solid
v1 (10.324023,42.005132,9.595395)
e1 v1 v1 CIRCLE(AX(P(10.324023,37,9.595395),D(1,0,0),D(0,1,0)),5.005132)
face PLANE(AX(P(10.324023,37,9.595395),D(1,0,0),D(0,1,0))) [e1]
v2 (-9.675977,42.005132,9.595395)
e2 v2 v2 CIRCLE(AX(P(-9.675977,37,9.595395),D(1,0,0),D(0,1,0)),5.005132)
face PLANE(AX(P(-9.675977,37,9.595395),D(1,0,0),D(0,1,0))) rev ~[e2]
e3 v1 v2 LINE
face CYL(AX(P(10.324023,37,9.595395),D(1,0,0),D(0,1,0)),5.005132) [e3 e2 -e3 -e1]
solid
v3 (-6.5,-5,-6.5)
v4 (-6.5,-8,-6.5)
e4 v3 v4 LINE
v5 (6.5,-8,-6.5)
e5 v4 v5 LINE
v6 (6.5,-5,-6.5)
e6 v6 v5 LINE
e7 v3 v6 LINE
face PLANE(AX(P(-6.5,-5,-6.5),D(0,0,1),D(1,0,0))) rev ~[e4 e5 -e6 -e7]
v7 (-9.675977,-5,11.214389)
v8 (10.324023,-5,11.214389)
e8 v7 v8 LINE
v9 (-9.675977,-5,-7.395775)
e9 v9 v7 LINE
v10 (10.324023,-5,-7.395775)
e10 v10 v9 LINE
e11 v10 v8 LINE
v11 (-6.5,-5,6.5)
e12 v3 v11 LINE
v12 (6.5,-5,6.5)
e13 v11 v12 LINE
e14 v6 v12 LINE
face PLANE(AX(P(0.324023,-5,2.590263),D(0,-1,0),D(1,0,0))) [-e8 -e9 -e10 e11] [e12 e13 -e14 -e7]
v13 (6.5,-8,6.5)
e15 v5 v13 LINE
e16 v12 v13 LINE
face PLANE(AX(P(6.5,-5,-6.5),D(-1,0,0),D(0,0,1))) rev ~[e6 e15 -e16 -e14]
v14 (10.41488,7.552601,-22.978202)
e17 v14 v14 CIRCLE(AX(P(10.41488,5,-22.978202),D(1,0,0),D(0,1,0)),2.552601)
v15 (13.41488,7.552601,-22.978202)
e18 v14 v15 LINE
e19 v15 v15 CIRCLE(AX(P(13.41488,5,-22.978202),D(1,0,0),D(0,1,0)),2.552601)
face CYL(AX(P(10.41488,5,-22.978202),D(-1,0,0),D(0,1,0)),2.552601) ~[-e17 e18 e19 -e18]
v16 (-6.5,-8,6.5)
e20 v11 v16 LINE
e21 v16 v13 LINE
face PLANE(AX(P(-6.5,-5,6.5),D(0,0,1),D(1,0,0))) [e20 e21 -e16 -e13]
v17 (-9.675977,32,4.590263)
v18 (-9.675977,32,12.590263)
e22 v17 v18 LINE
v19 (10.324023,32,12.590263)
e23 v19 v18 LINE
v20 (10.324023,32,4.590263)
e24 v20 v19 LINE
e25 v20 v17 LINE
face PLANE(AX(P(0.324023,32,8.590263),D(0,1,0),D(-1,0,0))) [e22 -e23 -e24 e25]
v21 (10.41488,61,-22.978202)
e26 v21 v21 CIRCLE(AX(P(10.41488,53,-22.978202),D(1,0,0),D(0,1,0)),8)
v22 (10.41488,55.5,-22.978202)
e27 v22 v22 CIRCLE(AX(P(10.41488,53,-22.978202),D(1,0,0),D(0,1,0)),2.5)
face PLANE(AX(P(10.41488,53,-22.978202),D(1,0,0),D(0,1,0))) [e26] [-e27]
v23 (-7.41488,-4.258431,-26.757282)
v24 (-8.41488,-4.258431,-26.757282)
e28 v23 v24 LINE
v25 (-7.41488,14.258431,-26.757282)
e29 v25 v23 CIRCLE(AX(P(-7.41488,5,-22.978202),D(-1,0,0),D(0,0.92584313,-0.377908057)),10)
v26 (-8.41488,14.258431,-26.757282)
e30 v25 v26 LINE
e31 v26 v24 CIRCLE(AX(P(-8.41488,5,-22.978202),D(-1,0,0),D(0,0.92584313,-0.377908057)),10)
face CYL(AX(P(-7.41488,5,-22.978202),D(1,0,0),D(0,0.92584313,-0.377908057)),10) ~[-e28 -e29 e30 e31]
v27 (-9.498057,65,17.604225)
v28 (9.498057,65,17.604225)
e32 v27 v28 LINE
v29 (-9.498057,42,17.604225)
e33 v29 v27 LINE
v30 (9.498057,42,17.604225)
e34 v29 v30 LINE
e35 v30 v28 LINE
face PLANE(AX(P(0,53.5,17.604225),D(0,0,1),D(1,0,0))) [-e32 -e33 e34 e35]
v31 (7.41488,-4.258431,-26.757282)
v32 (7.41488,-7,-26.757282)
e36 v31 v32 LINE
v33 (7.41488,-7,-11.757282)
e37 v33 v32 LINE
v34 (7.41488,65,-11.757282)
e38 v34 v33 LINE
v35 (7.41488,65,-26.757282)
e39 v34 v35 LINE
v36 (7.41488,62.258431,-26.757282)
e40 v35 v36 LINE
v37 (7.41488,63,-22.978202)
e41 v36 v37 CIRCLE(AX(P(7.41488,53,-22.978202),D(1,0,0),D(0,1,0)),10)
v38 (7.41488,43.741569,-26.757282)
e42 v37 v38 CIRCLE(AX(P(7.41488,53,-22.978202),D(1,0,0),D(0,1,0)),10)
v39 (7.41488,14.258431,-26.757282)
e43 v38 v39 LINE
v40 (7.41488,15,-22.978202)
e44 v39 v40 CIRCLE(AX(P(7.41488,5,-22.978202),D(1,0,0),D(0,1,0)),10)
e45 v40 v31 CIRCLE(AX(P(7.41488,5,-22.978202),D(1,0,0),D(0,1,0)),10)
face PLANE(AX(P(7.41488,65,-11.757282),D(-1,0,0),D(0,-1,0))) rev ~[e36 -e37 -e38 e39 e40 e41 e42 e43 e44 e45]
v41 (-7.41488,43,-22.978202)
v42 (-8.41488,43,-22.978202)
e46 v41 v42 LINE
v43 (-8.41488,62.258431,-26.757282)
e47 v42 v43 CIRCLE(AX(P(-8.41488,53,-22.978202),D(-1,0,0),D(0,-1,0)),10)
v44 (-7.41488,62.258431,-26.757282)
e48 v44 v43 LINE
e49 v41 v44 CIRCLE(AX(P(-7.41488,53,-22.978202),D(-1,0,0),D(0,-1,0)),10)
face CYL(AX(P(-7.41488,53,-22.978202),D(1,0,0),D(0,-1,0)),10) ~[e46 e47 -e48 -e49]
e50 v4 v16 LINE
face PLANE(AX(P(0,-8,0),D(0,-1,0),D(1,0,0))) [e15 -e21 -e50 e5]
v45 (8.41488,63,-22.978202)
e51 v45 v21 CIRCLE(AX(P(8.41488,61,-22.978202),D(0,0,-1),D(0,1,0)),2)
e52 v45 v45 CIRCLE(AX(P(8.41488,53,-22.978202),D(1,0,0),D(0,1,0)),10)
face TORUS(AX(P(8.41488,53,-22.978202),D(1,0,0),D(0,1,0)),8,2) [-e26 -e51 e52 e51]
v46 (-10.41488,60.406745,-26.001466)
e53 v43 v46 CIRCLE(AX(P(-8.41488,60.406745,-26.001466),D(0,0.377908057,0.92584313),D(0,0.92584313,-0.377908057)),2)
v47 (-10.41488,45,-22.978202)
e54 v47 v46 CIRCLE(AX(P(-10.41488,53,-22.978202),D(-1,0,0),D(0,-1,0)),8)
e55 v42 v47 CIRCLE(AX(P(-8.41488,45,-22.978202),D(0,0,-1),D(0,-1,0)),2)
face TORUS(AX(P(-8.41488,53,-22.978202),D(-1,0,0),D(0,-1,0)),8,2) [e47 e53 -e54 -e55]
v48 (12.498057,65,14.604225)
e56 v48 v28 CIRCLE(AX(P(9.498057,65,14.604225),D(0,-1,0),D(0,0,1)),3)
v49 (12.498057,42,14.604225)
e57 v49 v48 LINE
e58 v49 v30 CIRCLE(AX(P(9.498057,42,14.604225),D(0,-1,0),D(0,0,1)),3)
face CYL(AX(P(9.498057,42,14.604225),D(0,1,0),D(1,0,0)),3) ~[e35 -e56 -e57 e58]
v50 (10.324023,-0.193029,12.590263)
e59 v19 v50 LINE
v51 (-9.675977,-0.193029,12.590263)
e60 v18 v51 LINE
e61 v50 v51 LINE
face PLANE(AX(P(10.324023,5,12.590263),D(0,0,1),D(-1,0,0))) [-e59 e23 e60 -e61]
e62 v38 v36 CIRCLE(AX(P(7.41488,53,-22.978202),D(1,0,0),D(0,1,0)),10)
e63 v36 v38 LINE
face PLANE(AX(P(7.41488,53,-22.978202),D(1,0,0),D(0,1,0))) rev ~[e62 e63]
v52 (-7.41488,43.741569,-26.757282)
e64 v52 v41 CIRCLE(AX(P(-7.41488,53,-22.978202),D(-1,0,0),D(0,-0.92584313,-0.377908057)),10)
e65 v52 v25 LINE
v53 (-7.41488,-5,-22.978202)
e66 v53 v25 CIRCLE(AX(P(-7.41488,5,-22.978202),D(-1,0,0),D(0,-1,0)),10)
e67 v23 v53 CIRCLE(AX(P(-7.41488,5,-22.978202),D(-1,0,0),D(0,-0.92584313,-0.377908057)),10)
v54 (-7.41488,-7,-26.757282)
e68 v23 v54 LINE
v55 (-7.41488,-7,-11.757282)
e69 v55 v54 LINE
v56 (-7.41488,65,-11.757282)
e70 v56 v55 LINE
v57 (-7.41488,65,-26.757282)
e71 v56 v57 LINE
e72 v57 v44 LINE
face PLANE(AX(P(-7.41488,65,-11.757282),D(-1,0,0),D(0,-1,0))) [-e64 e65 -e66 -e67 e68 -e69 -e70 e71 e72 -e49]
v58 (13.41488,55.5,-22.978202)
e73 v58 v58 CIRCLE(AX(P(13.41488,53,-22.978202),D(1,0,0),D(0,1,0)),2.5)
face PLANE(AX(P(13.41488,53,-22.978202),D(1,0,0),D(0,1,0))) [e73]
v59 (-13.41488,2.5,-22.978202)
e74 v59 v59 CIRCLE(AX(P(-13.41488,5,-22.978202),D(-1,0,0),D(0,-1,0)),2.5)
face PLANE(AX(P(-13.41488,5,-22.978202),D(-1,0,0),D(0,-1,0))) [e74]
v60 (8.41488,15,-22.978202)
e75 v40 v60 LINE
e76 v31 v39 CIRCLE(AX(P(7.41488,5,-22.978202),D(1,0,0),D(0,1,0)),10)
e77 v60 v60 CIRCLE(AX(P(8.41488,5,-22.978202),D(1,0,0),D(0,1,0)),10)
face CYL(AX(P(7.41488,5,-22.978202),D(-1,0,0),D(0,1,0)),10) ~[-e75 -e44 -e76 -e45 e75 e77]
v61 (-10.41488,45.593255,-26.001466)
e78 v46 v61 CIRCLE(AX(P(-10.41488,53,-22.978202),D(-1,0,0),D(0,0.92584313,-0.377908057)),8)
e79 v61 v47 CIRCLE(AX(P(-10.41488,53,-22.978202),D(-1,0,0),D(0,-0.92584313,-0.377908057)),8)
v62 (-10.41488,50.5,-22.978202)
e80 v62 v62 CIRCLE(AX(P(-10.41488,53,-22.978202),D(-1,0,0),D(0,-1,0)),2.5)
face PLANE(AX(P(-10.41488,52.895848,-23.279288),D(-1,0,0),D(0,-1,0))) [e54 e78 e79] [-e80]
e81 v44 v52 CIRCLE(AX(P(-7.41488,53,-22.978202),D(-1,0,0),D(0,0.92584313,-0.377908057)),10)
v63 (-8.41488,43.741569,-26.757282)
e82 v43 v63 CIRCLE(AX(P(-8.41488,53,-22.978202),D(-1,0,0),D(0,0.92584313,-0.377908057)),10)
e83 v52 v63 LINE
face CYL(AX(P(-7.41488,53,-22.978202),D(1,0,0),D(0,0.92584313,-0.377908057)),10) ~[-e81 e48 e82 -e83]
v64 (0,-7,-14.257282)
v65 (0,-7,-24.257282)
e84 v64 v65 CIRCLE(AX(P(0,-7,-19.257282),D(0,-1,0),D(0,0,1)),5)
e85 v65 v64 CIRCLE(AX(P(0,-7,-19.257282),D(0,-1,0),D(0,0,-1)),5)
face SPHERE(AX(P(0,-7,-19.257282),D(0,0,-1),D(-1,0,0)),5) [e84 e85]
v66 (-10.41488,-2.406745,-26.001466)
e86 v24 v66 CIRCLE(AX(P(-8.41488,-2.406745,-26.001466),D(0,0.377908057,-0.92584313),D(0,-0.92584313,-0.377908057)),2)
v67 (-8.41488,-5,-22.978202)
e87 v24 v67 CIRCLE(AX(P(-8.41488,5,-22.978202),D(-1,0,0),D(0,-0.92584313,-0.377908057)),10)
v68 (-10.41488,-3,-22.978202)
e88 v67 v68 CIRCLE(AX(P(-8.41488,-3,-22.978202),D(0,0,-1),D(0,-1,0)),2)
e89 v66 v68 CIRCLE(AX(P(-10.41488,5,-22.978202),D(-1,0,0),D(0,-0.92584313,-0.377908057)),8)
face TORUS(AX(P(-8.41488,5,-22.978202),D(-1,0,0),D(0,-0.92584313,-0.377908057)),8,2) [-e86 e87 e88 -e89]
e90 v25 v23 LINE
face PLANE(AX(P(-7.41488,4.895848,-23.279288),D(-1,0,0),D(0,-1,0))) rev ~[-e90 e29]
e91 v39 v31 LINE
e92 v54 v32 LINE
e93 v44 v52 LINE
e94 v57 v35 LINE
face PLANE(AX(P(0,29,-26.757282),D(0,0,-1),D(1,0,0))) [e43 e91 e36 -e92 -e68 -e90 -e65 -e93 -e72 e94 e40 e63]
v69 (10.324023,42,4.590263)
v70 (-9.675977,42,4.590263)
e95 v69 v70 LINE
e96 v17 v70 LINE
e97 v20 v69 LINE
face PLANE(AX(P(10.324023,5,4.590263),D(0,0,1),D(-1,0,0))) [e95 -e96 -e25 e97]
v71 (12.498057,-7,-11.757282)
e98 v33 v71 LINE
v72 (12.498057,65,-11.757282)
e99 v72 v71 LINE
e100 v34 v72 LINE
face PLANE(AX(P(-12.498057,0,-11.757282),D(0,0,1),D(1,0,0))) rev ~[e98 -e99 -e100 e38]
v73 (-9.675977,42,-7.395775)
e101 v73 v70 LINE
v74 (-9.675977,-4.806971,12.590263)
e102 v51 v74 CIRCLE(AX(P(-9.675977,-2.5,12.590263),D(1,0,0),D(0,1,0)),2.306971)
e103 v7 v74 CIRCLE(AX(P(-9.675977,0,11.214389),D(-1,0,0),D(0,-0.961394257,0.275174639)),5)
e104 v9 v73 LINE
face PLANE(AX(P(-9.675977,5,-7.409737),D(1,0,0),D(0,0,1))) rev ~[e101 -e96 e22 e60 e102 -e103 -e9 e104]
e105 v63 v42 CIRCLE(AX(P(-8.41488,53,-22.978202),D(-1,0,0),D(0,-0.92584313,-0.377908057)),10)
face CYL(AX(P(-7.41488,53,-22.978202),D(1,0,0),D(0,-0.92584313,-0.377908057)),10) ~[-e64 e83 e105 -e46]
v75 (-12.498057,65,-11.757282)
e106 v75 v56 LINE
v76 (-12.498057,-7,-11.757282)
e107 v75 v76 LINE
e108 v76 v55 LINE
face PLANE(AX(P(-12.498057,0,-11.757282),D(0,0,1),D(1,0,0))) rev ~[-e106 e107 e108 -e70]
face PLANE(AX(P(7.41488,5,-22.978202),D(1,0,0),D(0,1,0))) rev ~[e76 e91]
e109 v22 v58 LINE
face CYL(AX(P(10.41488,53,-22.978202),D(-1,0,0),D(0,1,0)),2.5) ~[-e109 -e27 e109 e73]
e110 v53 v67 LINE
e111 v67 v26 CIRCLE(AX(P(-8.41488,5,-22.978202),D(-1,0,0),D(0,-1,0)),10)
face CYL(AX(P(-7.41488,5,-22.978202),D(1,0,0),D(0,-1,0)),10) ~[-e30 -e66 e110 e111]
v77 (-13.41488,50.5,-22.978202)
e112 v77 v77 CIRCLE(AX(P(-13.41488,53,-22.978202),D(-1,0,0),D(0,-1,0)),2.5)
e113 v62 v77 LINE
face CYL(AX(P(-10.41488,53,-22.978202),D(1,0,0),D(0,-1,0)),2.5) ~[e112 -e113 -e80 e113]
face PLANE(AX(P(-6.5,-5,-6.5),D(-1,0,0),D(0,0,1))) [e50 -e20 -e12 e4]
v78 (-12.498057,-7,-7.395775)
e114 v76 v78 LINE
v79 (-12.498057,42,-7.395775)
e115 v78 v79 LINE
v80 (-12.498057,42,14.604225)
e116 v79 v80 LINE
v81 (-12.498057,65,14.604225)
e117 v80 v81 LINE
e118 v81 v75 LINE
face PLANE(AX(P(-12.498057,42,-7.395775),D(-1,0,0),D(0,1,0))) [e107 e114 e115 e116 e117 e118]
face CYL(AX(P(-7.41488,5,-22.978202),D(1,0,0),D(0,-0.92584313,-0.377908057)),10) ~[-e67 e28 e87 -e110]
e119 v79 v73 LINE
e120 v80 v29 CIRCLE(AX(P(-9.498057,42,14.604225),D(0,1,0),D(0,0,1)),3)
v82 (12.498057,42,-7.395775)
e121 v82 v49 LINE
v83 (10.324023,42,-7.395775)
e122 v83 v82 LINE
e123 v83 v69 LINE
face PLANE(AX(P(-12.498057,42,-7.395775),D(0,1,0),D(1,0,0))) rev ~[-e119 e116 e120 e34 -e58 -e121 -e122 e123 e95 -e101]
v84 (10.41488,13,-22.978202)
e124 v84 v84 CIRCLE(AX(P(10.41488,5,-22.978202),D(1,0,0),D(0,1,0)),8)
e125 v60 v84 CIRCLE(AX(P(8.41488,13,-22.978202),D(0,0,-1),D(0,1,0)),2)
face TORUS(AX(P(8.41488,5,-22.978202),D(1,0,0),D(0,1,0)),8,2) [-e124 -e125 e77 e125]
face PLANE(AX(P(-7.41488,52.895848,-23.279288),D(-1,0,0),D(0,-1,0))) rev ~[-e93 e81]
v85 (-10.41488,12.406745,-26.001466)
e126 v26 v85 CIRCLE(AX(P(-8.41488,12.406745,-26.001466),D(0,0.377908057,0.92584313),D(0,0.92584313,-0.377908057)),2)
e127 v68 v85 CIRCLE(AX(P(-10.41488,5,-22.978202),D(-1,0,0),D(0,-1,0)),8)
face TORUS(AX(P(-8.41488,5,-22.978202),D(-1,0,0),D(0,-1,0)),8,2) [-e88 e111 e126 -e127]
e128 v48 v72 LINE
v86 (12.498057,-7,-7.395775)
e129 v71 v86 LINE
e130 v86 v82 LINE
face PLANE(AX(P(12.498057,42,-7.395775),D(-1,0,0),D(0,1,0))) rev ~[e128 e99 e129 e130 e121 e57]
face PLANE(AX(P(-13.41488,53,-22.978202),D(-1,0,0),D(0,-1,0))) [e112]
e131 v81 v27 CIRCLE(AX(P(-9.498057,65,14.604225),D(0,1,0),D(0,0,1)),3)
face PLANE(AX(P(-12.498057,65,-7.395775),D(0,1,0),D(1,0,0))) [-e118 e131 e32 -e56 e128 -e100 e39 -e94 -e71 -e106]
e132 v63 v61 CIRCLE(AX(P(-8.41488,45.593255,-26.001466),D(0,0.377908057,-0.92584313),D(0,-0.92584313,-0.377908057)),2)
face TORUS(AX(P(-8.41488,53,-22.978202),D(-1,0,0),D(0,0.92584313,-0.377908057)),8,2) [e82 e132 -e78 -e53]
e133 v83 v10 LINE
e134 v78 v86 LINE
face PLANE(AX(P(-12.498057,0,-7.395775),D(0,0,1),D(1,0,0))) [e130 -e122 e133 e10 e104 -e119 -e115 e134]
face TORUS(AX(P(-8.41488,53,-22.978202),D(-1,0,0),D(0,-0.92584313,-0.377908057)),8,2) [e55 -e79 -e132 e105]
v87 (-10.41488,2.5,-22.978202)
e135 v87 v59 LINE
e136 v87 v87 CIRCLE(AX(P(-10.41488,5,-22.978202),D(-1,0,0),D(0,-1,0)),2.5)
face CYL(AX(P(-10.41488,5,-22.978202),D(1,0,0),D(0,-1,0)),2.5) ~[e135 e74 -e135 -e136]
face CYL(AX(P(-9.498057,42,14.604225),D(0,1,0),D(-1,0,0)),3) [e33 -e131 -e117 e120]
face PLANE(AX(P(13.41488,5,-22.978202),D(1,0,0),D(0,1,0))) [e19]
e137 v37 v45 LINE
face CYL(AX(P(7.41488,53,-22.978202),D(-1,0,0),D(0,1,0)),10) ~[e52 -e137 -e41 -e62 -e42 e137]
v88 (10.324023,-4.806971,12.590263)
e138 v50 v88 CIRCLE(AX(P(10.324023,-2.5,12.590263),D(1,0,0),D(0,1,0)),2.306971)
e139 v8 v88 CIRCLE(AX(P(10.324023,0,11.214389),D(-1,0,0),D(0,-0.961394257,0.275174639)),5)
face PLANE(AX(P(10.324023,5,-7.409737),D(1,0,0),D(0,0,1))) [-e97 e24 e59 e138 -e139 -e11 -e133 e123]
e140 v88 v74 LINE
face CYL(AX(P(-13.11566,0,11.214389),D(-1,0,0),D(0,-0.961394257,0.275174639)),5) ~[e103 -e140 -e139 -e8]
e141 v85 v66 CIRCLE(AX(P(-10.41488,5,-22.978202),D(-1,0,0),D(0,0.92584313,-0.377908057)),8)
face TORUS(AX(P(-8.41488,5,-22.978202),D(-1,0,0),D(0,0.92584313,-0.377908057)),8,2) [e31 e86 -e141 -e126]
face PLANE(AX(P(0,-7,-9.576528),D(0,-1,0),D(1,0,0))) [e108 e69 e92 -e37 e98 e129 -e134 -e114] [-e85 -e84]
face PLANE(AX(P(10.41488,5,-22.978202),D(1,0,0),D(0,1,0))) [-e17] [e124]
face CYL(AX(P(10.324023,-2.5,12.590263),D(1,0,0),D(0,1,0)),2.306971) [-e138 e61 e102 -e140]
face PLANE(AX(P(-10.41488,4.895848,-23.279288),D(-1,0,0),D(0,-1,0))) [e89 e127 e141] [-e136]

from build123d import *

# Parameters (mm, degrees)
F0_W         = 20
F0_H         = 20
F1_DEPTH     = 5
F2_W         = 20
F2_H         = 8
F3_DEPTH     = 27
F4_W         = 20
F4_H         = 12
F5_DEPTH     = 37
F6_W         = 24.9961130321
F6_H         = 4.3615074828
F7_DEPTH     = 65
F8_W         = 24.9961130321
F8_H         = 4.3615074828
F9_DEPTH     = 7
F10_W        = 24.9961130321
F10_H        = 23
F11_DEPTH    = 25
F12_R        = 5.00513233
F13_DEPTH    = 20
F14_W        = 14.829759486
F14_H        = 72
F15_DEPTH    = 15
F17_DEPTH    = 20
F18_T1_DEPTH = 26.8793659776
F19_R        = 10
F20_DEPTH    = 3
F22_DEPTH    = 3
F25_R        = 2.5526009998
F26_DEPTH    = 3
F27_R        = 2.5
F28_DEPTH    = 3
F29_R        = 2.5
F30_DEPTH    = 3
F31_R        = 2.5
F32_DEPTH    = 3
F33_R        = 2
F34_R        = 3
F35_W        = 13
F35_H        = 13
F36_DEPTH    = 3


# Not quite as in the source:
# - a fillet or chamfer that OpenCascade refuses, or shapes differently, is made with other operations: its cross-section is extruded or revolved along the edge and cut away or added


with BuildPart() as f1:
    # F0 (on Front) → F1 (new body, symmetric)
    with BuildSketch(Plane.XZ):
        with Locations((0.3240229562, 2.5902625751)):
            Rectangle(F0_W, F0_H)
    extrude(amount=F1_DEPTH, both=True)

    # F2 (on face) → F3 (join)
    with BuildSketch(Plane(origin=(0, 5, 0), x_dir=(-1, 0, 0), z_dir=(0, 1, 0))):
        with Locations((-0.3240229562, 8.5902625751)):
            Rectangle(F2_W, F2_H)
    extrude(amount=F3_DEPTH)

    # F4 (on face) → F5 (join)
    with BuildSketch(Plane(origin=(0, 5, 0), x_dir=(-1, 0, 0), z_dir=(0, 1, 0))):
        with Locations((-0.3240229562, -1.4097374249)):
            Rectangle(F4_W, F4_H)
    extrude(amount=F5_DEPTH)

    # F6 (on Front) → F7 (join)
    with BuildSketch(Plane.XZ):
        with Locations((0, -9.5765283331)):
            Rectangle(F6_W, F6_H)
    extrude(amount=-F7_DEPTH)

    # F8 (on face) → F9 (join)
    with BuildSketch(Plane.XZ):
        with Locations((0, -9.5765283331)):
            Rectangle(F8_W, F8_H)
    extrude(amount=F9_DEPTH)

    # F10 (on face) → F11 (join)
    with BuildSketch(Plane.XY.offset(-7.3957745917)):
        with Locations((0, 53.5)):
            Rectangle(F10_W, F10_H)
    extrude(amount=F11_DEPTH)

    # F14 (on face) → F15 (join)
    with BuildSketch(Plane(origin=(0, 0, -11.7572820745), x_dir=(1, 0, 0), z_dir=(0, 0, -1))):
        with Locations((0, -29)):
            Rectangle(F14_W, F14_H)
    extrude(amount=F15_DEPTH)

    # F16 (on face) → F17 (join)
    with BuildSketch(Plane.YZ.offset(10.3240229562)):
        with BuildLine():
            ThreePointArc((-0.1930287134, 12.5902625751), (-2.5, 14.8972338617), (-4.8069712866, 12.5902625751))
            Line((-4.8069712866, 12.5902625751), (-0.1930287134, 12.5902625751))
        make_face()
    extrude(amount=-F17_DEPTH)

    # F18: fillet of radius 5 on 1 edges, made by hand

    # F18_s2 → F18_t1 (cut)
    with BuildSketch(Plane.YZ.offset(-13.1156600326)):
        with BuildLine():
            ThreePointArc((-4.8069712866, 12.5902625751), (-4.951507671, 11.9090632481), (-5, 11.2143893796))
            Line((-5, 11.2143893796), (-5, 12.5902625751))
            Line((-5, 12.5902625751), (-4.8069712866, 12.5902625751))
        make_face()
    extrude(amount=F18_T1_DEPTH, mode=Mode.SUBTRACT)

    # F19 (on face) → F20 (join)
    with BuildSketch(Plane.YZ.offset(7.414879743)):
        with Locations((5, -22.9782015085)):
            Circle(F19_R)
        with Locations((53, -22.9782015085)):
            Circle(F19_R)
    extrude(amount=F20_DEPTH)

    # F21 (on face) → F22 (join)
    with BuildSketch(Plane(origin=(-7.414879743, 0, 0), x_dir=(0, -1, 0), z_dir=(-1, 0, 0))):
        with BuildLine():
            ThreePointArc((-43, -22.9782015085), (-54.9255761518, -13.1653448152), (-62.2584312967, -26.7572820745))
            ThreePointArc((-62.2584312967, -26.7572820745), (-53, -32.9782015085), (-43.7415687033, -26.7572820745))
            ThreePointArc((-43.7415687033, -26.7572820745), (-43.1871433067, -24.9037776604), (-43, -22.9782015085))
        make_face()
        with BuildLine():
            ThreePointArc((5, -22.9782015085), (-6.9255761518, -13.1653448152), (-14.2584312967, -26.7572820745))
            ThreePointArc((-14.2584312967, -26.7572820745), (-5, -32.9782015085), (4.2584312967, -26.7572820745))
            ThreePointArc((4.2584312967, -26.7572820745), (4.8128566933, -24.9037776604), (5, -22.9782015085))
        make_face()
    extrude(amount=F22_DEPTH)

    # F23 (on face) → F24 (revolve)
    with BuildSketch(Plane.XZ.offset(7)):
        with BuildLine():
            Line((0, -24.2572820745), (0, -14.2572820745))
            ThreePointArc((0, -14.2572820745), (-5, -19.2572820745), (0, -24.2572820745))
        make_face()
    revolve(axis=Axis((0, -7, -19.2572820745), (0, 0, -1)))

    # F25 (on face) → F26 (join)
    with BuildSketch(Plane.YZ.offset(10.414879743)):
        with Locations((5, -22.9782015085)):
            Circle(F25_R)
    extrude(amount=F26_DEPTH)

    # F27 (on face) → F28 (join)
    with BuildSketch(Plane.YZ.offset(10.414879743)):
        with Locations((53, -22.9782015085)):
            Circle(F27_R)
    extrude(amount=F28_DEPTH)

    # F29 (on face) → F30 (join)
    with BuildSketch(Plane(origin=(-10.414879743, 0, 0), x_dir=(0, -1, 0), z_dir=(-1, 0, 0))):
        with Locations((-5, -22.9782015085)):
            Circle(F29_R)
    extrude(amount=F30_DEPTH)

    # F31 (on face) → F32 (join)
    with BuildSketch(Plane(origin=(-10.414879743, 0, 0), x_dir=(0, -1, 0), z_dir=(-1, 0, 0))):
        with Locations((-53, -22.9782015085)):
            Circle(F31_R)
    extrude(amount=F32_DEPTH)

    # F33
    f33_edges = [f1.edges().sort_by_distance(p)[0] for p in [
        (-10.41488, 63, -22.978202),
        (-10.41488, 15, -22.978202),
        (10.41488, 43, -22.978202),
        (10.41488, -5, -22.978202),
    ]]
    fillet(f33_edges, radius=F33_R)

    # F34
    f34_edges = [f1.edges().sort_by_distance(p)[0] for p in [
        (12.498057, 53.5, 17.604225),
        (-12.498057, 53.5, 17.604225),
    ]]
    fillet(f34_edges, radius=F34_R)

    # F35 (on face) → F36 (join)
    with BuildSketch(Plane.XZ.offset(5)):
        Rectangle(F35_W, F35_H)
    extrude(amount=F36_DEPTH)


with BuildPart() as f13:
    # F12 (on face) → F13 (new body)
    with BuildSketch(Plane.YZ.offset(10.3240229562)):
        with Locations((37, 9.5953949051)):
            Circle(F12_R)
    extrude(amount=-F13_DEPTH)


solid = Compound([f1.part, f13.part])
